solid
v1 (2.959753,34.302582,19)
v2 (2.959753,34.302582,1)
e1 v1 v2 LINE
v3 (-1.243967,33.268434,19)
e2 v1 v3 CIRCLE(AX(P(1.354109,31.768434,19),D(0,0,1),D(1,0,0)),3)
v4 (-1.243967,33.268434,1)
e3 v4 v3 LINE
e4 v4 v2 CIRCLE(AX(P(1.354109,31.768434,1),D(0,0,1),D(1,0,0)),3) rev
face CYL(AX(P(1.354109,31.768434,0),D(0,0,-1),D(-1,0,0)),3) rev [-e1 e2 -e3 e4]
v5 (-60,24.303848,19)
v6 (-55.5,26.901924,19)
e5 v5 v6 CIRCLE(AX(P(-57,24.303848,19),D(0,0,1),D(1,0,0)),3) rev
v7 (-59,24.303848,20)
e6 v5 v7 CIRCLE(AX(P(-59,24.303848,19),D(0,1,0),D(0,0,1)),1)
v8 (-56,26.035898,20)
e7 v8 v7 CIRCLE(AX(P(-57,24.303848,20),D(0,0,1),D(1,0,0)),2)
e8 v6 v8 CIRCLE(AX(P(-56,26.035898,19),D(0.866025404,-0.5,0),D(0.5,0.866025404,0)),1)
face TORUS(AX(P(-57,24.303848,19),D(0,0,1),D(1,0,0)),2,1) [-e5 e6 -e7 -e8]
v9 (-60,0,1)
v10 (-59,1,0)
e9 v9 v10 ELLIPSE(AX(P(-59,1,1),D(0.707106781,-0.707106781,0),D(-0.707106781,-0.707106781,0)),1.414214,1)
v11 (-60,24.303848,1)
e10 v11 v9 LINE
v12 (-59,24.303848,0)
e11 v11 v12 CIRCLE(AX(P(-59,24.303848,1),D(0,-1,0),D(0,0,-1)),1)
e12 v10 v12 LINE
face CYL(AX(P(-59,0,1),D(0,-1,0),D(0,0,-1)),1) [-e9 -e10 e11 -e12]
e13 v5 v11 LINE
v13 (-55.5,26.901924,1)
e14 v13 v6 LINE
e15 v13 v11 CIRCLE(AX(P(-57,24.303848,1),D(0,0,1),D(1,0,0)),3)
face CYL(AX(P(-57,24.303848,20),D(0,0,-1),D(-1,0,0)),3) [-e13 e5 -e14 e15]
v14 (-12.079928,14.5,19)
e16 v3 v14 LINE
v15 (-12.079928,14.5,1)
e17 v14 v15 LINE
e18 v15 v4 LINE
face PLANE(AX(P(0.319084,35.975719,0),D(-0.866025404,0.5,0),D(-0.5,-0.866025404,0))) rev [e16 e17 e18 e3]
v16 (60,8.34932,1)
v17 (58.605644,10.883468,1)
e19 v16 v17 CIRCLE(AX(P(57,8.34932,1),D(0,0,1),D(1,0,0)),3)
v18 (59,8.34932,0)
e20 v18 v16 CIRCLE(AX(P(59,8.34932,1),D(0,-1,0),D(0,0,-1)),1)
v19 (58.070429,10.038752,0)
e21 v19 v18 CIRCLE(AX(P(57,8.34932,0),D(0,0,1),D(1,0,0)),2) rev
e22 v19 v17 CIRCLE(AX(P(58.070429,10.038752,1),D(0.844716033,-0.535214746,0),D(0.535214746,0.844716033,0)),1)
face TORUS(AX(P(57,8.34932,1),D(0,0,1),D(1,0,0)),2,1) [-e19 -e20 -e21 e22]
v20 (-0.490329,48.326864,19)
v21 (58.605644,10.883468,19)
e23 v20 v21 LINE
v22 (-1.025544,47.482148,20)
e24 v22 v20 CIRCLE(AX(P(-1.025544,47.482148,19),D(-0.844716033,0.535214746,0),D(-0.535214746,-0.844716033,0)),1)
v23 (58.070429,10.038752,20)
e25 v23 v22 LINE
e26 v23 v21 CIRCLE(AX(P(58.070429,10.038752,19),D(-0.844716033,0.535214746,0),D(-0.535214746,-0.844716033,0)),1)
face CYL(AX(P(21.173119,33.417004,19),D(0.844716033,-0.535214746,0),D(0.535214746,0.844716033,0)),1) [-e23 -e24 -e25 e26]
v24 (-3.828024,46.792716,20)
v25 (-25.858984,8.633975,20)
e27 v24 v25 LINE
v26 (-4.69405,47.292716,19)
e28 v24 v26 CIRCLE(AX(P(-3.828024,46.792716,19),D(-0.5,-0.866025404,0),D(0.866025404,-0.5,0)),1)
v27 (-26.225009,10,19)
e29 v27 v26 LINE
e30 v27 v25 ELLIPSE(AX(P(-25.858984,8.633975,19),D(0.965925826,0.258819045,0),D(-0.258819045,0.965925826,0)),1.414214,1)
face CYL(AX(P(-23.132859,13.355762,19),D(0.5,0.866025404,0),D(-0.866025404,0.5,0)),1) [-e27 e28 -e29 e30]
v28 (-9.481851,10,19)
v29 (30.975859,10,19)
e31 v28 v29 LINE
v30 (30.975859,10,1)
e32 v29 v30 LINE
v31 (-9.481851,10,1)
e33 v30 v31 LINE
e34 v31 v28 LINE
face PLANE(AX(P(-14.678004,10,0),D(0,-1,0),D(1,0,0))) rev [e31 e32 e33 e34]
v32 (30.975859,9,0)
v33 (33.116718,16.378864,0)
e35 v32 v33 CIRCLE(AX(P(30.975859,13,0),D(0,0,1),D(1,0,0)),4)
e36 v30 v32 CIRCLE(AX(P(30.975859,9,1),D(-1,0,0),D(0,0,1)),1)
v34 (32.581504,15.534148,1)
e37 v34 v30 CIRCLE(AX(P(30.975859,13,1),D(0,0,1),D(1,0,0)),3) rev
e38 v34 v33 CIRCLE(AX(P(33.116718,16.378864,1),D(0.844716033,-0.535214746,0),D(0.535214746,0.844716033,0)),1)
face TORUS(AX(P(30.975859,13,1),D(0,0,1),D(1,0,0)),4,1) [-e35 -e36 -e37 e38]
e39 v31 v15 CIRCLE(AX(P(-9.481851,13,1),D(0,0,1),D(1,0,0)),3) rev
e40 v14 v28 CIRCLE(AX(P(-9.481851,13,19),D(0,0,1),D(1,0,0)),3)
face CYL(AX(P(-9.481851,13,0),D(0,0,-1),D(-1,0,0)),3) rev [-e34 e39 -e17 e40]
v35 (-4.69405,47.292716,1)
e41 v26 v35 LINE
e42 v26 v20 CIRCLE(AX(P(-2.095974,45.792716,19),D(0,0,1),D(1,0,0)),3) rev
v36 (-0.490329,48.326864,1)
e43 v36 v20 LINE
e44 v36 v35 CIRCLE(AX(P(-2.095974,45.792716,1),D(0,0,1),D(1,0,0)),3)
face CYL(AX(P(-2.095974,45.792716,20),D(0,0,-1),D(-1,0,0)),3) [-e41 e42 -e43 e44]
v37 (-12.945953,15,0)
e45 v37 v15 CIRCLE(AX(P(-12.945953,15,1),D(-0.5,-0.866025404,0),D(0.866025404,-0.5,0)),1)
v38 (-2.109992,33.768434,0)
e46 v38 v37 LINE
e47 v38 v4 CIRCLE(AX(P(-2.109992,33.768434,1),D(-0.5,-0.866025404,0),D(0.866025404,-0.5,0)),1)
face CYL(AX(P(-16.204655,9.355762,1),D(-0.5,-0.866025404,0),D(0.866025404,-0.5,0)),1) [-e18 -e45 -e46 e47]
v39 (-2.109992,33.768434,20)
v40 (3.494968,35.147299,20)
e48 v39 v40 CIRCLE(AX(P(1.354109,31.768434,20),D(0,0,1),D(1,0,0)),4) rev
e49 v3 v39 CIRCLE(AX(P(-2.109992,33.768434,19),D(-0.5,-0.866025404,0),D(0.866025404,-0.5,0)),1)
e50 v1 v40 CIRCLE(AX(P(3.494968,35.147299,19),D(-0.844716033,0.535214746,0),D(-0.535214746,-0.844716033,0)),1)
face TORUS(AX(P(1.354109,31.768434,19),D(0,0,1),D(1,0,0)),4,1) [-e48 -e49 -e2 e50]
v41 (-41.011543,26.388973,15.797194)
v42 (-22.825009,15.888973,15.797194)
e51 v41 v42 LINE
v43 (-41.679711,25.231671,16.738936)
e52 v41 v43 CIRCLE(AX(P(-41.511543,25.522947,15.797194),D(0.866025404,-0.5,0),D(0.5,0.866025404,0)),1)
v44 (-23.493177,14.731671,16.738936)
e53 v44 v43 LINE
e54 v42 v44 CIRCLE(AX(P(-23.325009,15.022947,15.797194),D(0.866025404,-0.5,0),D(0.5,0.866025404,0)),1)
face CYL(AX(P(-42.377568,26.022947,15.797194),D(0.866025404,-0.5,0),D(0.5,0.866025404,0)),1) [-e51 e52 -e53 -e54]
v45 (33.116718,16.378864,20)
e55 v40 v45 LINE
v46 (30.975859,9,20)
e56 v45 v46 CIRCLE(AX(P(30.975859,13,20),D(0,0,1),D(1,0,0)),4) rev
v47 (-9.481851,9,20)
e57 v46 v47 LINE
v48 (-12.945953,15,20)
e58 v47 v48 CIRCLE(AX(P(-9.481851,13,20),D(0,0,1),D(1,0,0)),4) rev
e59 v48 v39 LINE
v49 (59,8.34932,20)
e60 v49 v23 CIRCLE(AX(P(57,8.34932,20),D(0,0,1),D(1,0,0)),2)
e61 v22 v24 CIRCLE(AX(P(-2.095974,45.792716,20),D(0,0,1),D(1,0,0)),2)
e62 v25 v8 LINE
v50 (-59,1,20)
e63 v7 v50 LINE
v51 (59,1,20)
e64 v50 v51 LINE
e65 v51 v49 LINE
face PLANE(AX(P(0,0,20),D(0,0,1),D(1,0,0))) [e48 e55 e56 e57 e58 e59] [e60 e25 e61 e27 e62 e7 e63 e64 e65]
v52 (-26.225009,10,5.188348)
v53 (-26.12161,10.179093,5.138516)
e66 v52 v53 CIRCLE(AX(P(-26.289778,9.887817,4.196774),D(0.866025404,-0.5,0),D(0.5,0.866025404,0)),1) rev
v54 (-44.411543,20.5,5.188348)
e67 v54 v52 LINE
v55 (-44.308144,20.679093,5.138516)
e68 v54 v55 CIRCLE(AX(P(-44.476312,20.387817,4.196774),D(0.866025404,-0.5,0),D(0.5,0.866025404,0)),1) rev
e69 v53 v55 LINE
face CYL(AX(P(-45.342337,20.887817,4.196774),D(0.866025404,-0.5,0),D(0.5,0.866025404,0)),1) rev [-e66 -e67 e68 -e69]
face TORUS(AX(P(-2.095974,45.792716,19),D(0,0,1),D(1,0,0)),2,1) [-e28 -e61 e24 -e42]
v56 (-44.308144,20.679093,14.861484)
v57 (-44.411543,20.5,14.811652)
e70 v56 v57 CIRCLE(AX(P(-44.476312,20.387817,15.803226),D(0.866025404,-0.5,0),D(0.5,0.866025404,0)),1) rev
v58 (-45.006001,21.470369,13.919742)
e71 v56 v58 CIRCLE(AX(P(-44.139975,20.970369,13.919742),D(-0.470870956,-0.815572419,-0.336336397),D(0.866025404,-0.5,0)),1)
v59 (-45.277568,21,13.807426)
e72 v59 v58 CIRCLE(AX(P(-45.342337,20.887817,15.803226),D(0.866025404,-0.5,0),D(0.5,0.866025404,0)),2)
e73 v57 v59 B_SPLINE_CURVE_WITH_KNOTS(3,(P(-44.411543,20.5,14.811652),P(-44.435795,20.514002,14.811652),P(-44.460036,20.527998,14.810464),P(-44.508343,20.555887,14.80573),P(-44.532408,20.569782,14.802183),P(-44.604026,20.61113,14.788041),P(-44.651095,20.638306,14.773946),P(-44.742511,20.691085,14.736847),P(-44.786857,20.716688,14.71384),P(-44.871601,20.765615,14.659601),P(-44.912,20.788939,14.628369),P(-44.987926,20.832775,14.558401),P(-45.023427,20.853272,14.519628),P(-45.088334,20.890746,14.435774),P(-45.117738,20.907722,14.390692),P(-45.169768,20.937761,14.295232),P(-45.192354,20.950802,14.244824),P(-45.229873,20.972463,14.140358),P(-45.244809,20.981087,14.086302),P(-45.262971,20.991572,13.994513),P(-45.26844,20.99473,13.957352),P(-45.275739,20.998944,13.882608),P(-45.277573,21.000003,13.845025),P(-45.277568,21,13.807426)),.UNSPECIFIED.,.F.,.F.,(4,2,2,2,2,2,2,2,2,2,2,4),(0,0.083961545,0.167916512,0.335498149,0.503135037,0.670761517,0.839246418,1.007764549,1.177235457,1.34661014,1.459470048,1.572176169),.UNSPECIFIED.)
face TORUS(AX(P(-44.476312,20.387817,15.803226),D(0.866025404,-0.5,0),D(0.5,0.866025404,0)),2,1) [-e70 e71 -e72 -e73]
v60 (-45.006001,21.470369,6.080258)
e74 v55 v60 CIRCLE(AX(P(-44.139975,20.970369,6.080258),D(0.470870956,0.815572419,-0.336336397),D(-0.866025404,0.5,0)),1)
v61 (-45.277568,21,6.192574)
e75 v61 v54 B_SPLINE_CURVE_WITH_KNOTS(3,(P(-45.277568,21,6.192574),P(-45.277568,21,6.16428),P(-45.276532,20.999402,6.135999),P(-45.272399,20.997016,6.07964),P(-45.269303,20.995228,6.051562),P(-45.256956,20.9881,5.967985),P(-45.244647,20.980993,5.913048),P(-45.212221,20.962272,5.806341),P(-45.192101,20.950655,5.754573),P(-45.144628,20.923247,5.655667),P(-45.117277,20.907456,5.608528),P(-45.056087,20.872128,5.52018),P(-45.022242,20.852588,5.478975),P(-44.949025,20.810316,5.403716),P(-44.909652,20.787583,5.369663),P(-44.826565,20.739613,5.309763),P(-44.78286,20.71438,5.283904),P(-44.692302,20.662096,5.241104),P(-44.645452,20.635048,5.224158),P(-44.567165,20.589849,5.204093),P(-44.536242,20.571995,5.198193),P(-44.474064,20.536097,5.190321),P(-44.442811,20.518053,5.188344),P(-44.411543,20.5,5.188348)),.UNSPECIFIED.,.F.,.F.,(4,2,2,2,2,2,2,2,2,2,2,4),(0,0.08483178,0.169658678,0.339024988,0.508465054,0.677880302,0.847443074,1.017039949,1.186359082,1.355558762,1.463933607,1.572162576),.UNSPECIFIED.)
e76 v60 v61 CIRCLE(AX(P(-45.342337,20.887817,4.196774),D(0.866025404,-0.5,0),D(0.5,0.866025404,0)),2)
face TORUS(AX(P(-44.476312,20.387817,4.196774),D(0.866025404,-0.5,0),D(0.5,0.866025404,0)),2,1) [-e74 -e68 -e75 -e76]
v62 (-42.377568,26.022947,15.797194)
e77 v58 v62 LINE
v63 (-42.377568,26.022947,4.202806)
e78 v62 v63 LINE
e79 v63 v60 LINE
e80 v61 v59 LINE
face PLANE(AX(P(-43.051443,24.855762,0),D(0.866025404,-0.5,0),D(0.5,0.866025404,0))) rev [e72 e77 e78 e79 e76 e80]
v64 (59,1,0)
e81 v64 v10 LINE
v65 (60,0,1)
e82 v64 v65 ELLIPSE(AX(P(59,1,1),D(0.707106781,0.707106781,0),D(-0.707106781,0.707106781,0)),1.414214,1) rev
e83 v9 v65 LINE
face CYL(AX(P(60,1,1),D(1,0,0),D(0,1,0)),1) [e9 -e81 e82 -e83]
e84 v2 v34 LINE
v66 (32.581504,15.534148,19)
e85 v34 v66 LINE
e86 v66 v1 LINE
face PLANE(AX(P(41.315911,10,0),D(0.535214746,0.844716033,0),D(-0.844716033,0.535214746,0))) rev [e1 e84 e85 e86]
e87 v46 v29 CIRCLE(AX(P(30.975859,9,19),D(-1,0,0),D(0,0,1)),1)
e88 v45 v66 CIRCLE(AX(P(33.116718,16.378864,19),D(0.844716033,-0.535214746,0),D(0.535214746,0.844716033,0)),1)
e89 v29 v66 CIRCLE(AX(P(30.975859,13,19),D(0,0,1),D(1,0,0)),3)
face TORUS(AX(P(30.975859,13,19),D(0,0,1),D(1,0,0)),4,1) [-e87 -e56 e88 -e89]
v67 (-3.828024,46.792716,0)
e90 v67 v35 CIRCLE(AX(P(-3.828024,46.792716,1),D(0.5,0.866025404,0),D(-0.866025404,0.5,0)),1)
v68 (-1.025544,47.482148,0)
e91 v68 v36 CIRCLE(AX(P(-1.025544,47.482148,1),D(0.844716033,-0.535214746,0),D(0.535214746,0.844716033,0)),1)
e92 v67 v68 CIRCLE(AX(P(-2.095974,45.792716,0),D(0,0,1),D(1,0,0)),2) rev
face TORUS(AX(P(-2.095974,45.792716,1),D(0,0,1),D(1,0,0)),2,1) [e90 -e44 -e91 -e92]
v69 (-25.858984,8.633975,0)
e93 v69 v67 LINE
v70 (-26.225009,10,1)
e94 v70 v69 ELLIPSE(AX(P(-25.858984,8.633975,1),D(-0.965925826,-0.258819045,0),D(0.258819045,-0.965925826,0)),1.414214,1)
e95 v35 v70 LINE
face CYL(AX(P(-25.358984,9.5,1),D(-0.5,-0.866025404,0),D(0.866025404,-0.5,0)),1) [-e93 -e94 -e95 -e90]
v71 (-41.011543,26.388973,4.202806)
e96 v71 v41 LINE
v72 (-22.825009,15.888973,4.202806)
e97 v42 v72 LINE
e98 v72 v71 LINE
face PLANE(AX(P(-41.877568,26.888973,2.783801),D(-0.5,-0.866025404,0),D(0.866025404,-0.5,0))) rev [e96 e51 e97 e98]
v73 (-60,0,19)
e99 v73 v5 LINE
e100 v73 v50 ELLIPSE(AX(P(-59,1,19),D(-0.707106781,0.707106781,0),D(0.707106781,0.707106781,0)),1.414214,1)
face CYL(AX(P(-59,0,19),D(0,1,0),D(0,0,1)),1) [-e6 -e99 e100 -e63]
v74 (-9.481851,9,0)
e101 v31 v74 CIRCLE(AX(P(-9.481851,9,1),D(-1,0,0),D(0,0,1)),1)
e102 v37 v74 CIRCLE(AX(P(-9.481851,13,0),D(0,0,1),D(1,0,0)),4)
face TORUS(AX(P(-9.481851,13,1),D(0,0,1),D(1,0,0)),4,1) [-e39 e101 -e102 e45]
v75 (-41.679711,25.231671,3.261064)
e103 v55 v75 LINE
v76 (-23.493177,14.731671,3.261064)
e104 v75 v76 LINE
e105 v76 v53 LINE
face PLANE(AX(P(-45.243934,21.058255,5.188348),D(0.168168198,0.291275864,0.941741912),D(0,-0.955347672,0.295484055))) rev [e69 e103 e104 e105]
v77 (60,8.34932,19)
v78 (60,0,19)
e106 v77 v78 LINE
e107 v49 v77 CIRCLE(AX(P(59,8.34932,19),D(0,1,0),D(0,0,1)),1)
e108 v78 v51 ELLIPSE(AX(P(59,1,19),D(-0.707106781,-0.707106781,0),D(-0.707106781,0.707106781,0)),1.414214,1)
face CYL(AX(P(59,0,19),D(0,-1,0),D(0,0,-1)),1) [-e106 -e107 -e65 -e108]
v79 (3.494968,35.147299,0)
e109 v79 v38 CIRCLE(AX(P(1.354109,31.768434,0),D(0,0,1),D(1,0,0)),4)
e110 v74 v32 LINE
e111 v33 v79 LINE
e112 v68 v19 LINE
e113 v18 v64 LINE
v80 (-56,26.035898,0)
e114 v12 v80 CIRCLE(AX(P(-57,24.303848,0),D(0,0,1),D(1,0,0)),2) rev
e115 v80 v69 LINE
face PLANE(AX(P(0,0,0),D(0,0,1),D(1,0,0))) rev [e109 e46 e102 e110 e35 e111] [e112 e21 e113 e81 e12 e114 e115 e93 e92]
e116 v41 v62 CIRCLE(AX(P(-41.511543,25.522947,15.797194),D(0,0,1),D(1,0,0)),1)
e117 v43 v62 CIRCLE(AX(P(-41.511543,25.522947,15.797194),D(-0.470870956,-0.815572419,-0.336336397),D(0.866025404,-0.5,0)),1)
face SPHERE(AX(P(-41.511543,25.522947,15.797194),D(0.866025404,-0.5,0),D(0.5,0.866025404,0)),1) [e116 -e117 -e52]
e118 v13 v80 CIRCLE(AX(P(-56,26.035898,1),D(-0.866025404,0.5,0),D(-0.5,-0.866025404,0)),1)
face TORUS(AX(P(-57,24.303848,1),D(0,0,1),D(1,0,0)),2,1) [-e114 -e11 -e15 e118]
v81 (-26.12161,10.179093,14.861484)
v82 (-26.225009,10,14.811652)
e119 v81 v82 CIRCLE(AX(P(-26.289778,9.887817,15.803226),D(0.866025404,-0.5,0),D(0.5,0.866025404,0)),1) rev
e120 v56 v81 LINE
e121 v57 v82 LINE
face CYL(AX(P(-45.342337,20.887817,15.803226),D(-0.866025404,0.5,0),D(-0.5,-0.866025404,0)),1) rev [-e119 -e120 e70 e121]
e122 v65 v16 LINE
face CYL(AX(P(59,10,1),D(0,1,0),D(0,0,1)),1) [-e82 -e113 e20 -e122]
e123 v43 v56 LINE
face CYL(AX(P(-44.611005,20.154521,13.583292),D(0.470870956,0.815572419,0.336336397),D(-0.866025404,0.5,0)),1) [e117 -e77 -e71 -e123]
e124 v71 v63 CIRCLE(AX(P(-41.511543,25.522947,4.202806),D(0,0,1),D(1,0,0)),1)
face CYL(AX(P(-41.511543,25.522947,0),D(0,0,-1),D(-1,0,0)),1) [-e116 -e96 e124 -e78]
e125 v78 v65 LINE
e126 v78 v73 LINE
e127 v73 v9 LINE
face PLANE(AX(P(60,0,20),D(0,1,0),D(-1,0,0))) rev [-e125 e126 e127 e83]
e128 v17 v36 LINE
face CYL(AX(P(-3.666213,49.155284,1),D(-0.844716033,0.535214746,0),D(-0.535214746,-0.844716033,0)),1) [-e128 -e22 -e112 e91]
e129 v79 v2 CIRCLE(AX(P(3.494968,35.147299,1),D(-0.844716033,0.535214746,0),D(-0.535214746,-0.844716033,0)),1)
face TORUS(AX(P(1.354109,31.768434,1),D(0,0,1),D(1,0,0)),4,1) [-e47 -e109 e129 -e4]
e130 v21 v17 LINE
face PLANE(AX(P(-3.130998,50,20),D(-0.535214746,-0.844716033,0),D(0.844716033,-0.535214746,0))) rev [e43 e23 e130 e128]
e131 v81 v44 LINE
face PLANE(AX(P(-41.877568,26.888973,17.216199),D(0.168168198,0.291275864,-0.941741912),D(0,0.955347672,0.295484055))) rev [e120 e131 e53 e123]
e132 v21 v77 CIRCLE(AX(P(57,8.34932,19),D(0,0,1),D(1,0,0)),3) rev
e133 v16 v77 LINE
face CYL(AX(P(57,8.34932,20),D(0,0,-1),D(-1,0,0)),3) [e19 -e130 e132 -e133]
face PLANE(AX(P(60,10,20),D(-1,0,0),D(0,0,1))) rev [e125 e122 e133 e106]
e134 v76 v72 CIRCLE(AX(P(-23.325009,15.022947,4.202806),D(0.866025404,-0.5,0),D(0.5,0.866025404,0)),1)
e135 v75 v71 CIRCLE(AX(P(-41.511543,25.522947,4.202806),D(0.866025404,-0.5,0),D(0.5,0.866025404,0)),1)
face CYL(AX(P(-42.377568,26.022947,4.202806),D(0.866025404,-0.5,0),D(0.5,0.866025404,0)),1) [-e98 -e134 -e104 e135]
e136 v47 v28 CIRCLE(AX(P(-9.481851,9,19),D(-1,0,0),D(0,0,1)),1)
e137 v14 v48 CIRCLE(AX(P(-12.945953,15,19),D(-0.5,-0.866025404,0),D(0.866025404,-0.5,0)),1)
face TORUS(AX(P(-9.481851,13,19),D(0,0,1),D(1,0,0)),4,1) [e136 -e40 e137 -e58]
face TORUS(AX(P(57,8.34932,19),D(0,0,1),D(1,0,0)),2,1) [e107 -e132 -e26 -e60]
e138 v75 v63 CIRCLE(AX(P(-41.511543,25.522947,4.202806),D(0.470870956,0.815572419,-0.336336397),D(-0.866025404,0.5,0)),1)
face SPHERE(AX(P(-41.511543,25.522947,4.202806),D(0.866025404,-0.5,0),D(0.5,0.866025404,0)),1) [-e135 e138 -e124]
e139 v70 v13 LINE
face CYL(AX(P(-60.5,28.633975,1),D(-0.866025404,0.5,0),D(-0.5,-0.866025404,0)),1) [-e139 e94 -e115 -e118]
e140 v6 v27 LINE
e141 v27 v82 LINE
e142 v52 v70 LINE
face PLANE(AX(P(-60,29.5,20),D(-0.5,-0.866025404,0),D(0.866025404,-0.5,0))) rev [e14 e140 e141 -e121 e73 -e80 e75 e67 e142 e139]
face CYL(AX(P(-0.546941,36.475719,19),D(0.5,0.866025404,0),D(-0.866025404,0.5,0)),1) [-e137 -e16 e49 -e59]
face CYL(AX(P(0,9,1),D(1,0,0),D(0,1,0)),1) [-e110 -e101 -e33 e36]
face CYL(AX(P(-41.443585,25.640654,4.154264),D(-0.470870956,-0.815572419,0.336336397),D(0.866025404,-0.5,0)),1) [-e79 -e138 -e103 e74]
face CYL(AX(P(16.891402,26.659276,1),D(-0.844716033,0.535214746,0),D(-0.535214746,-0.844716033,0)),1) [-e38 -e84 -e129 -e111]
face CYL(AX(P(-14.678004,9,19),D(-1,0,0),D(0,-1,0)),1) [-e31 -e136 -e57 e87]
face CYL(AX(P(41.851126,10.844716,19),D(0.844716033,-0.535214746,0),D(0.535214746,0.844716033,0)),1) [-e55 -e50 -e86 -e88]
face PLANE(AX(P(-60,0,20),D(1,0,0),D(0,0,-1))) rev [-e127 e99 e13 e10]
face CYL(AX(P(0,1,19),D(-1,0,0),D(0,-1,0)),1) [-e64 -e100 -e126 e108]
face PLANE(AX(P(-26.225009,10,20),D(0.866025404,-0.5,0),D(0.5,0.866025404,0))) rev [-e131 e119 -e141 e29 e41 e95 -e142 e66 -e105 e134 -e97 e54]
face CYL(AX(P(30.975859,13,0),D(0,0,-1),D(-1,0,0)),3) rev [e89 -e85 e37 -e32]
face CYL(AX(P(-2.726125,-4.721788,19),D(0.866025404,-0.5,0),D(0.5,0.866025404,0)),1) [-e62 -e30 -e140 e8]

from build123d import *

# Parameters (mm, degrees)
RESSALTO_EXTRUS_O1_DEPTH = 20
RESSALTO_EXTRUS_O2_DEPTH = 22
CORTE_EXTRUS_O1_DEPTH    = 81.622577483
FILETE1_R                = 3
FILETE2_R                = 1
FILETE4_R                = 1


with BuildPart() as part:
    # Esboço1 → Ressalto-extrusão1 (new body)
    with BuildSketch(Plane.XY):
        Polygon((60, 0), (-60, 0), (-60, 29.5), (-26.225009252, 10), (-3.130998485, 50), (60, 10), align=None)
    extrude(amount=RESSALTO_EXTRUS_O1_DEPTH)

    # Esboço2 → Ressalto-extrusão2 (add)
    with BuildSketch(Plane(origin=(-23.998883958, 13.855762114, 0), x_dir=(0, 0, 1), z_dir=(-0.8660254037844418, 0.49999999999999484, 0))):
        Polygon((5.188348382, -4.384983309), (2.783800982, 2.347749412), (17.216199018, 2.347749412), (14.811651618, -4.384983309), (14.811651618, -4.452250588), (5.188348382, -4.452250588), align=None)
    extrude(amount=RESSALTO_EXTRUS_O2_DEPTH)

    # Esboço3 → Corte-extrusão1 (cut, through all)
    with BuildSketch(Plane.XY.offset(20)):
        Polygon((-14.678003869, 10), (41.315910897, 10), (0.319084351, 35.975718762), align=None)
    extrude(amount=-CORTE_EXTRUS_O1_DEPTH, mode=Mode.SUBTRACT)

    # Filete1
    filete1_edges = [part.edges().sort_by_distance(p)[0] for p in [
        (-60, 29.5, 10),
        (-3.130998485, 50, 10),
        (60, 10, 10),
        (-14.678003869, 10, 10),
        (0.319084351, 35.975718762, 10),
        (41.315910897, 10, 10),
    ]]
    fillet(filete1_edges, radius=FILETE1_R)

    # Filete2
    # the kernel refuses this fillet: 1 mm, written as the material it adds along each edge
    with BuildSketch(Plane(origin=(-25.870593694, 9.873051646, 5.188348382), x_dir=(-0.4999999999999947, -0.8660254037844417, -8.936278675324251e-11), z_dir=(-0.8660254037844417, 0.4999999999999947, 0))) as filete2_piece_1:
        with BuildLine():
            CenterArc((0.196805258, -0.991574461), FILETE2_R, 97.442894705, 12.210929358)
            Line((-0.139531139, -0.04983255), (0, 0))
            Line((0, 0), (0.067267279, 0))
        make_face()
    extrude(amount=22.370407054)
    with BuildSketch(Plane(origin=(-25.870593694, 9.873051646, 14.811651618), x_dir=(-0.4999999999999947, -0.8660254037844417, 8.941560163903726e-11), z_dir=(-0.8660254037844417, 0.4999999999999947, 0))) as filete2_piece_2:
        with BuildLine():
            CenterArc((0.196805258, 0.991574461), FILETE2_R, 250.346175937, 12.210929358)
            Line((-0.139531139, 0.04983255), (0, 0))
            Line((0, 0), (0.067267279, 0))
        make_face()
    extrude(amount=22.370407054)
    # the kernel refuses this fillet: 1 mm, written as the material it takes off along each edge
    with BuildSketch(Plane(origin=(-26.225009252, 10, 20), x_dir=(0.8660254037844417, -0.49999999999999484, 0), z_dir=(0.49999999999999484, 0.8660254037844417, 0))) as filete2_2_piece_1:
        with BuildLine():
            CenterArc((FILETE2_R, FILETE2_R), FILETE2_R, 180, 90)
            Line((0, FILETE2_R), (0, 0))
            Line((0, 0), (FILETE2_R, 0))
        make_face()
    extrude(amount=43.061918814, mode=Mode.SUBTRACT)
    with BuildSketch(Plane(origin=(-2.095973634, 45.792715629, 20), x_dir=(0.5352147458149246, 0.8447160326774114, 0), z_dir=(0.8447160326774114, -0.5352147458149246, 0))) as filete2_2_piece_2:
        with BuildLine():
            CenterArc((3 - FILETE2_R, -FILETE2_R), FILETE2_R, 0, 90)
            Line((3, -FILETE2_R), (3, 0))
            Line((3, 0), (3 - FILETE2_R, 0))
        make_face()
    revolve(axis=Axis((-2.095973634, 45.792715629, 20), (0, 0, 1)), revolution_arc=92.358476116, mode=Mode.SUBTRACT)
    with BuildSketch(Plane(origin=(-0.490329397, 48.326863727, 20), x_dir=(-0.5352147458149248, -0.8447160326774114, 0), z_dir=(0.8447160326774115, -0.5352147458149248, 0))) as filete2_2_piece_3:
        with BuildLine():
            CenterArc((FILETE2_R, FILETE2_R), FILETE2_R, 180, 90)
            Line((0, FILETE2_R), (0, 0))
            Line((0, 0), (FILETE2_R, 0))
        make_face()
    extrude(amount=69.959573807, mode=Mode.SUBTRACT)
    with BuildSketch(Plane(origin=(57, 8.349320116, 20), x_dir=(1, 0, 0), z_dir=(0, -1, 0))) as filete2_2_piece_4:
        with BuildLine():
            CenterArc((3 - FILETE2_R, -FILETE2_R), FILETE2_R, 0, 90)
            Line((3 - FILETE2_R, 0), (3, 0))
            Line((3, 0), (3, -FILETE2_R))
        make_face()
    revolve(axis=Axis((57, 8.349320116, 20), (0, 0, 1)), revolution_arc=57.641523884, mode=Mode.SUBTRACT)
    with BuildSketch(Plane(origin=(60, 8.349320116, 20), x_dir=(0, 0, -1), z_dir=(0, -1, 0))) as filete2_2_piece_5:
        with BuildLine():
            CenterArc((FILETE2_R, -FILETE2_R), FILETE2_R, 90, 90)
            Line((0, -FILETE2_R), (0, 0))
            Line((0, 0), (FILETE2_R, 0))
        make_face()
    extrude(amount=10.849320116, mode=Mode.SUBTRACT)
    with BuildSketch(Plane(origin=(62.5, 0, 20), x_dir=(0, 0, -1), z_dir=(-1, 0, 0)), Plane(origin=(62.5, 0, 0), x_dir=(0, 1, 0), z_dir=(-1, 0, 0))) as filete2_2_piece_6:
        with BuildLine():
            CenterArc((FILETE2_R, -FILETE2_R), FILETE2_R, 90, 90)
            Line((0, -FILETE2_R), (0, 0))
            Line((0, 0), (FILETE2_R, 0))
        make_face()
    extrude(amount=125, mode=Mode.SUBTRACT)
    with BuildSketch(Plane(origin=(-60, -2.5, 20), x_dir=(1, 0, 0), z_dir=(0, 1, 0))) as filete2_2_piece_7:
        with BuildLine():
            CenterArc((FILETE2_R, FILETE2_R), FILETE2_R, 180, 90)
            Line((0, FILETE2_R), (0, 0))
            Line((0, 0), (FILETE2_R, 0))
        make_face()
    extrude(amount=26.803847577, mode=Mode.SUBTRACT)
    with BuildSketch(Plane(origin=(-57, 24.303847577, 20), x_dir=(-1, 0, 0), z_dir=(0, -1, 0))) as filete2_2_piece_8:
        with BuildLine():
            CenterArc((3 - FILETE2_R, FILETE2_R), FILETE2_R, 270, 90)
            Line((3, FILETE2_R), (3, 0))
            Line((3, 0), (3 - FILETE2_R, 0))
        make_face()
    revolve(axis=Axis((-57, 24.303847577, 20), (0, 0, -1)), revolution_arc=120, mode=Mode.SUBTRACT)
    with BuildSketch(Plane(origin=(-55.5, 26.901923789, 20), x_dir=(-0.499999999999995, -0.8660254037844416, 0), z_dir=(0.8660254037844416, -0.499999999999995, 0))) as filete2_2_piece_9:
        with BuildLine():
            CenterArc((FILETE2_R, FILETE2_R), FILETE2_R, 180, 90)
            Line((0, FILETE2_R), (0, 0))
            Line((0, 0), (FILETE2_R, 0))
        make_face()
    extrude(amount=33.803847577, mode=Mode.SUBTRACT)
    with BuildSketch(Plane(origin=(-9.481851446, 13, 20), x_dir=(0, -1, 0), z_dir=(1, 0, 0))) as filete2_2_piece_10:
        with BuildLine():
            CenterArc((3 + FILETE2_R, FILETE2_R), FILETE2_R, 180, 90)
            Line((3, FILETE2_R), (3, 0))
            Line((3, 0), (3 + FILETE2_R, 0))
        make_face()
    revolve(axis=Axis((-9.481851446, 13, 20), (0, 0, -1)), revolution_arc=120, mode=Mode.SUBTRACT)
    with BuildSketch(Plane(origin=(-9.481851446, 10, 20), x_dir=(0, -1, 0), z_dir=(1, 0, 0)), Plane(origin=(30.97585928, 10, 0), x_dir=(0, -1, 0), z_dir=(-1, 0, 0))) as filete2_2_piece_11:
        with BuildLine():
            CenterArc((FILETE2_R, FILETE2_R), FILETE2_R, 180, 90)
            Line((0, FILETE2_R), (0, 0))
            Line((0, 0), (FILETE2_R, 0))
        make_face()
    extrude(amount=40.457710726, mode=Mode.SUBTRACT)
    with BuildSketch(Plane(origin=(30.97585928, 13, 20), x_dir=(0, -1, 0), z_dir=(-1, 0, 0))) as filete2_2_piece_12:
        with BuildLine():
            CenterArc((3 + FILETE2_R, -FILETE2_R), FILETE2_R, 90, 90)
            Line((3, -FILETE2_R), (3, 0))
            Line((3, 0), (3 + FILETE2_R, 0))
        make_face()
    revolve(axis=Axis((30.97585928, 13, 20), (0, 0, 1)), revolution_arc=147.641523884, mode=Mode.SUBTRACT)
    with BuildSketch(Plane(origin=(32.581503517, 15.534148098, 20), x_dir=(0.5352147458149246, 0.8447160326774116, 0), z_dir=(-0.8447160326774116, 0.5352147458149246, 0)), Plane(origin=(2.95975344, 34.302582489, 0), x_dir=(0.5352147458149246, 0.8447160326774116, 1.7763568394002497e-15), z_dir=(0.8447160326774116, -0.5352147458149246, 0))) as filete2_2_piece_13:
        with BuildLine():
            CenterArc((FILETE2_R, FILETE2_R), FILETE2_R, 180, 90)
            Line((0, FILETE2_R), (0, 0))
            Line((0, 0), (FILETE2_R, 0))
        make_face()
    extrude(amount=35.067110049, mode=Mode.SUBTRACT)
    with BuildSketch(Plane(origin=(1.354109202, 31.768434391, 20), x_dir=(-0.8660254037844415, 0.49999999999999517, 0), z_dir=(-0.49999999999999517, -0.8660254037844415, 0))) as filete2_2_piece_14:
        with BuildLine():
            CenterArc((3 + FILETE2_R, FILETE2_R), FILETE2_R, 180, 90)
            Line((3, FILETE2_R), (3, 0))
            Line((3, 0), (3 + FILETE2_R, 0))
        make_face()
    revolve(axis=Axis((1.354109202, 31.768434391, 20), (0, 0, -1)), revolution_arc=92.358476116, mode=Mode.SUBTRACT)
    with BuildSketch(Plane(origin=(-1.243967009, 33.268434391, 20), x_dir=(-0.8660254037844417, 0.4999999999999949, 0), z_dir=(-0.4999999999999949, -0.8660254037844417, 0)), Plane(origin=(-12.079927657, 14.5, 0), x_dir=(-0.8660254037844417, 0.4999999999999949, 0), z_dir=(0.4999999999999949, 0.8660254037844417, 0))) as filete2_2_piece_15:
        with BuildLine():
            CenterArc((FILETE2_R, FILETE2_R), FILETE2_R, 180, 90)
            Line((0, FILETE2_R), (0, 0))
            Line((0, 0), (FILETE2_R, 0))
        make_face()
    extrude(amount=21.671921296, mode=Mode.SUBTRACT)
    with BuildSketch(Plane(origin=(60, 8.349320116, 0), x_dir=(0, 0, 1), z_dir=(0, -1, 0))) as filete2_2_piece_16:
        with BuildLine():
            CenterArc((FILETE2_R, FILETE2_R), FILETE2_R, 180, 90)
            Line((0, FILETE2_R), (0, 0))
            Line((0, 0), (FILETE2_R, 0))
        make_face()
    extrude(amount=10.849320116, mode=Mode.SUBTRACT)
    with BuildSketch(Plane(origin=(57, 8.349320116, 0), x_dir=(1, 0, 0), z_dir=(0, -1, 0))) as filete2_2_piece_17:
        with BuildLine():
            CenterArc((3 - FILETE2_R, FILETE2_R), FILETE2_R, 270, 90)
            Line((3, FILETE2_R), (3, 0))
            Line((3, 0), (3 - FILETE2_R, 0))
        make_face()
    revolve(axis=Axis((57, 8.349320116, 0), (0, 0, 1)), revolution_arc=57.641523884, mode=Mode.SUBTRACT)
    with BuildSketch(Plane(origin=(-0.490329397, 48.326863727, 0), x_dir=(-0.5352147458149248, -0.8447160326774114, 0), z_dir=(0.8447160326774115, -0.5352147458149248, 0))) as filete2_2_piece_18:
        with BuildLine():
            CenterArc((FILETE2_R, -FILETE2_R), FILETE2_R, 90, 90)
            Line((0, -FILETE2_R), (0, 0))
            Line((0, 0), (FILETE2_R, 0))
        make_face()
    extrude(amount=69.959573807, mode=Mode.SUBTRACT)
    with BuildSketch(Plane(origin=(-2.095973634, 45.792715629, 0), x_dir=(0.5352147458149246, 0.8447160326774114, 0), z_dir=(0.8447160326774114, -0.5352147458149246, 0))) as filete2_2_piece_19:
        with BuildLine():
            CenterArc((3 - FILETE2_R, FILETE2_R), FILETE2_R, 270, 90)
            Line((3, FILETE2_R), (3, 0))
            Line((3, 0), (3 - FILETE2_R, 0))
        make_face()
    revolve(axis=Axis((-2.095973634, 45.792715629, 0), (0, 0, 1)), revolution_arc=92.358476116, mode=Mode.SUBTRACT)
    with BuildSketch(Plane(origin=(-26.225009252, 10, 0), x_dir=(0.8660254037844417, -0.49999999999999484, 0), z_dir=(0.49999999999999484, 0.8660254037844417, 0))) as filete2_2_piece_20:
        with BuildLine():
            CenterArc((FILETE2_R, -FILETE2_R), FILETE2_R, 90, 90)
            Line((0, -FILETE2_R), (0, 0))
            Line((0, 0), (FILETE2_R, 0))
        make_face()
    extrude(amount=43.061918814, mode=Mode.SUBTRACT)
    with BuildSketch(Plane(origin=(-55.5, 26.901923789, 0), x_dir=(-0.499999999999995, -0.8660254037844416, 0), z_dir=(0.8660254037844416, -0.499999999999995, 0))) as filete2_2_piece_21:
        with BuildLine():
            CenterArc((FILETE2_R, -FILETE2_R), FILETE2_R, 90, 90)
            Line((0, -FILETE2_R), (0, 0))
            Line((0, 0), (FILETE2_R, 0))
        make_face()
    extrude(amount=33.803847577, mode=Mode.SUBTRACT)
    with BuildSketch(Plane(origin=(-57, 24.303847577, 0), x_dir=(-1, 0, 0), z_dir=(0, -1, 0))) as filete2_2_piece_22:
        with BuildLine():
            CenterArc((3 - FILETE2_R, -FILETE2_R), FILETE2_R, 0, 90)
            Line((3, -FILETE2_R), (3, 0))
            Line((3, 0), (3 - FILETE2_R, 0))
        make_face()
    revolve(axis=Axis((-57, 24.303847577, 0), (0, 0, -1)), revolution_arc=120, mode=Mode.SUBTRACT)
    with BuildSketch(Plane(origin=(-60, -2.5, 0), x_dir=(1, 0, 0), z_dir=(0, 1, 0))) as filete2_2_piece_23:
        with BuildLine():
            CenterArc((FILETE2_R, -FILETE2_R), FILETE2_R, 90, 90)
            Line((0, -FILETE2_R), (0, 0))
            Line((0, 0), (FILETE2_R, 0))
        make_face()
    extrude(amount=26.803847577, mode=Mode.SUBTRACT)
    with BuildSketch(Plane(origin=(-9.481851446, 13, 0), x_dir=(0, -1, 0), z_dir=(1, 0, 0))) as filete2_2_piece_24:
        with BuildLine():
            CenterArc((3 + FILETE2_R, -FILETE2_R), FILETE2_R, 90, 90)
            Line((3, -FILETE2_R), (3, 0))
            Line((3, 0), (3 + FILETE2_R, 0))
        make_face()
    revolve(axis=Axis((-9.481851446, 13, 0), (0, 0, -1)), revolution_arc=120, mode=Mode.SUBTRACT)
    with BuildSketch(Plane(origin=(1.354109202, 31.768434391, 0), x_dir=(-0.8660254037844415, 0.49999999999999517, 0), z_dir=(-0.49999999999999517, -0.8660254037844415, 0))) as filete2_2_piece_25:
        with BuildLine():
            CenterArc((3 + FILETE2_R, -FILETE2_R), FILETE2_R, 90, 90)
            Line((3, -FILETE2_R), (3, 0))
            Line((3, 0), (3 + FILETE2_R, 0))
        make_face()
    revolve(axis=Axis((1.354109202, 31.768434391, 0), (0, 0, -1)), revolution_arc=92.358476116, mode=Mode.SUBTRACT)
    with BuildSketch(Plane(origin=(30.97585928, 13, 0), x_dir=(0, -1, 0), z_dir=(-1, 0, 0))) as filete2_2_piece_26:
        with BuildLine():
            CenterArc((3 + FILETE2_R, FILETE2_R), FILETE2_R, 180, 90)
            Line((3, FILETE2_R), (3, 0))
            Line((3, 0), (3 + FILETE2_R, 0))
        make_face()
    revolve(axis=Axis((30.97585928, 13, 0), (0, 0, 1)), revolution_arc=147.641523884, mode=Mode.SUBTRACT)
    with BuildSketch(Plane(origin=(-22.825009252, 15.888972746, 2.783800982), x_dir=(0, 0, 1), z_dir=(-0.8660254037844417, 0.4999999999999947, 0)), Plane(origin=(-22.825009252, 15.888972746, 17.216199018), x_dir=(-0.4708709557974139, -0.8155724192496512, -0.33633639699815604), z_dir=(-0.8660254037844417, 0.4999999999999947, 0))) as filete2_2_piece_27:
        with BuildLine():
            CenterArc((FILETE2_R * 1.41900491052, -FILETE2_R), FILETE2_R, 90, 109.653824058)
            Line((FILETE2_R * 0.477262998928, -FILETE2_R * 1.336336397), (0, 0))
            Line((0, 0), (FILETE2_R * 1.41900491052, 0))
        make_face()
    extrude(amount=25.547512276, mode=Mode.SUBTRACT)
    with BuildSketch(Plane(origin=(-27.475009252, 7.834936491, 20), x_dir=(0.8660254037844417, -0.4999999999999948, 0), z_dir=(0.49999999999999484, 0.8660254037844417, 0))) as filete2_2_piece_28a_section:
        with BuildLine():
            CenterArc((FILETE2_R, FILETE2_R), FILETE2_R, 180, 90)
            Line((0, FILETE2_R), (0, 0))
            Line((0, 0), (FILETE2_R, 0))
        make_face()
    filete2_2_piece_28a = extrude(amount=45.561918814, mode=Mode.PRIVATE)
    filete2_2_piece_28a = split(filete2_2_piece_28a, bisect_by=Plane(origin=(-26.225009252, 10, 20), z_dir=(-0.499999999999995, -0.8660254037844416, 0)), keep=Keep.TOP, mode=Mode.PRIVATE)
    with BuildSketch(Plane(origin=(-55.5, 26.901923789, 20), x_dir=(-0.499999999999995, -0.8660254037844416, 0), z_dir=(0.8660254037844416, -0.499999999999995, 0))) as filete2_2_piece_28b_section:
        with BuildLine():
            CenterArc((FILETE2_R, FILETE2_R), FILETE2_R, 180, 90)
            Line((0, FILETE2_R), (0, 0))
            Line((0, 0), (FILETE2_R, 0))
        make_face()
    filete2_2_piece_28b = extrude(amount=36.303847577, mode=Mode.PRIVATE)
    filete2_2_piece_28b = split(filete2_2_piece_28b, bisect_by=Plane(origin=(-26.225009252, 10, 20), z_dir=(0.8660254037844417, -0.49999999999999484, 0)), keep=Keep.TOP, mode=Mode.PRIVATE)
    filete2_2_piece_28 = filete2_2_piece_28a & filete2_2_piece_28b
    add(filete2_2_piece_28, mode=Mode.SUBTRACT)
    with BuildSketch(Plane(origin=(-27.475009252, 7.834936491, 0), x_dir=(0.8660254037844417, -0.4999999999999948, 0), z_dir=(0.49999999999999484, 0.8660254037844417, 0))) as filete2_2_piece_29a_section:
        with BuildLine():
            CenterArc((FILETE2_R, -FILETE2_R), FILETE2_R, 90, 90)
            Line((0, -FILETE2_R), (0, 0))
            Line((0, 0), (FILETE2_R, 0))
        make_face()
    filete2_2_piece_29a = extrude(amount=45.561918814, mode=Mode.PRIVATE)
    filete2_2_piece_29a = split(filete2_2_piece_29a, bisect_by=Plane(origin=(-26.225009252, 10, 0), z_dir=(-0.499999999999995, -0.8660254037844416, 0)), keep=Keep.TOP, mode=Mode.PRIVATE)
    with BuildSketch(Plane(origin=(-55.5, 26.901923789, 0), x_dir=(-0.499999999999995, -0.8660254037844416, 0), z_dir=(0.8660254037844416, -0.499999999999995, 0))) as filete2_2_piece_29b_section:
        with BuildLine():
            CenterArc((FILETE2_R, -FILETE2_R), FILETE2_R, 90, 90)
            Line((0, -FILETE2_R), (0, 0))
            Line((0, 0), (FILETE2_R, 0))
        make_face()
    filete2_2_piece_29b = extrude(amount=36.303847577, mode=Mode.PRIVATE)
    filete2_2_piece_29b = split(filete2_2_piece_29b, bisect_by=Plane(origin=(-26.225009252, 10, 0), z_dir=(0.8660254037844417, -0.49999999999999484, 0)), keep=Keep.TOP, mode=Mode.PRIVATE)
    filete2_2_piece_29 = filete2_2_piece_29a & filete2_2_piece_29b
    add(filete2_2_piece_29, mode=Mode.SUBTRACT)

    # Filete4
    filete4_edges = [part.edges().sort_by_distance(p)[0] for p in [
        (-43.85995263, 23.455382081, 4.199789907),
        (-43.85995263, 23.455382081, 15.800210093),
        (-41.877568136, 26.888972746, 10),
        (-42.089543917, 26.521819922, 16.614609668),
        (-42.089543917, 26.521819922, 3.385390332),
        (-45.22520413, 21.090697119, 5.16894646),
        (-45.22520413, 21.090697119, 14.83105354),
    ]]
    fillet(filete4_edges, radius=FILETE4_R)


solid = part.part
